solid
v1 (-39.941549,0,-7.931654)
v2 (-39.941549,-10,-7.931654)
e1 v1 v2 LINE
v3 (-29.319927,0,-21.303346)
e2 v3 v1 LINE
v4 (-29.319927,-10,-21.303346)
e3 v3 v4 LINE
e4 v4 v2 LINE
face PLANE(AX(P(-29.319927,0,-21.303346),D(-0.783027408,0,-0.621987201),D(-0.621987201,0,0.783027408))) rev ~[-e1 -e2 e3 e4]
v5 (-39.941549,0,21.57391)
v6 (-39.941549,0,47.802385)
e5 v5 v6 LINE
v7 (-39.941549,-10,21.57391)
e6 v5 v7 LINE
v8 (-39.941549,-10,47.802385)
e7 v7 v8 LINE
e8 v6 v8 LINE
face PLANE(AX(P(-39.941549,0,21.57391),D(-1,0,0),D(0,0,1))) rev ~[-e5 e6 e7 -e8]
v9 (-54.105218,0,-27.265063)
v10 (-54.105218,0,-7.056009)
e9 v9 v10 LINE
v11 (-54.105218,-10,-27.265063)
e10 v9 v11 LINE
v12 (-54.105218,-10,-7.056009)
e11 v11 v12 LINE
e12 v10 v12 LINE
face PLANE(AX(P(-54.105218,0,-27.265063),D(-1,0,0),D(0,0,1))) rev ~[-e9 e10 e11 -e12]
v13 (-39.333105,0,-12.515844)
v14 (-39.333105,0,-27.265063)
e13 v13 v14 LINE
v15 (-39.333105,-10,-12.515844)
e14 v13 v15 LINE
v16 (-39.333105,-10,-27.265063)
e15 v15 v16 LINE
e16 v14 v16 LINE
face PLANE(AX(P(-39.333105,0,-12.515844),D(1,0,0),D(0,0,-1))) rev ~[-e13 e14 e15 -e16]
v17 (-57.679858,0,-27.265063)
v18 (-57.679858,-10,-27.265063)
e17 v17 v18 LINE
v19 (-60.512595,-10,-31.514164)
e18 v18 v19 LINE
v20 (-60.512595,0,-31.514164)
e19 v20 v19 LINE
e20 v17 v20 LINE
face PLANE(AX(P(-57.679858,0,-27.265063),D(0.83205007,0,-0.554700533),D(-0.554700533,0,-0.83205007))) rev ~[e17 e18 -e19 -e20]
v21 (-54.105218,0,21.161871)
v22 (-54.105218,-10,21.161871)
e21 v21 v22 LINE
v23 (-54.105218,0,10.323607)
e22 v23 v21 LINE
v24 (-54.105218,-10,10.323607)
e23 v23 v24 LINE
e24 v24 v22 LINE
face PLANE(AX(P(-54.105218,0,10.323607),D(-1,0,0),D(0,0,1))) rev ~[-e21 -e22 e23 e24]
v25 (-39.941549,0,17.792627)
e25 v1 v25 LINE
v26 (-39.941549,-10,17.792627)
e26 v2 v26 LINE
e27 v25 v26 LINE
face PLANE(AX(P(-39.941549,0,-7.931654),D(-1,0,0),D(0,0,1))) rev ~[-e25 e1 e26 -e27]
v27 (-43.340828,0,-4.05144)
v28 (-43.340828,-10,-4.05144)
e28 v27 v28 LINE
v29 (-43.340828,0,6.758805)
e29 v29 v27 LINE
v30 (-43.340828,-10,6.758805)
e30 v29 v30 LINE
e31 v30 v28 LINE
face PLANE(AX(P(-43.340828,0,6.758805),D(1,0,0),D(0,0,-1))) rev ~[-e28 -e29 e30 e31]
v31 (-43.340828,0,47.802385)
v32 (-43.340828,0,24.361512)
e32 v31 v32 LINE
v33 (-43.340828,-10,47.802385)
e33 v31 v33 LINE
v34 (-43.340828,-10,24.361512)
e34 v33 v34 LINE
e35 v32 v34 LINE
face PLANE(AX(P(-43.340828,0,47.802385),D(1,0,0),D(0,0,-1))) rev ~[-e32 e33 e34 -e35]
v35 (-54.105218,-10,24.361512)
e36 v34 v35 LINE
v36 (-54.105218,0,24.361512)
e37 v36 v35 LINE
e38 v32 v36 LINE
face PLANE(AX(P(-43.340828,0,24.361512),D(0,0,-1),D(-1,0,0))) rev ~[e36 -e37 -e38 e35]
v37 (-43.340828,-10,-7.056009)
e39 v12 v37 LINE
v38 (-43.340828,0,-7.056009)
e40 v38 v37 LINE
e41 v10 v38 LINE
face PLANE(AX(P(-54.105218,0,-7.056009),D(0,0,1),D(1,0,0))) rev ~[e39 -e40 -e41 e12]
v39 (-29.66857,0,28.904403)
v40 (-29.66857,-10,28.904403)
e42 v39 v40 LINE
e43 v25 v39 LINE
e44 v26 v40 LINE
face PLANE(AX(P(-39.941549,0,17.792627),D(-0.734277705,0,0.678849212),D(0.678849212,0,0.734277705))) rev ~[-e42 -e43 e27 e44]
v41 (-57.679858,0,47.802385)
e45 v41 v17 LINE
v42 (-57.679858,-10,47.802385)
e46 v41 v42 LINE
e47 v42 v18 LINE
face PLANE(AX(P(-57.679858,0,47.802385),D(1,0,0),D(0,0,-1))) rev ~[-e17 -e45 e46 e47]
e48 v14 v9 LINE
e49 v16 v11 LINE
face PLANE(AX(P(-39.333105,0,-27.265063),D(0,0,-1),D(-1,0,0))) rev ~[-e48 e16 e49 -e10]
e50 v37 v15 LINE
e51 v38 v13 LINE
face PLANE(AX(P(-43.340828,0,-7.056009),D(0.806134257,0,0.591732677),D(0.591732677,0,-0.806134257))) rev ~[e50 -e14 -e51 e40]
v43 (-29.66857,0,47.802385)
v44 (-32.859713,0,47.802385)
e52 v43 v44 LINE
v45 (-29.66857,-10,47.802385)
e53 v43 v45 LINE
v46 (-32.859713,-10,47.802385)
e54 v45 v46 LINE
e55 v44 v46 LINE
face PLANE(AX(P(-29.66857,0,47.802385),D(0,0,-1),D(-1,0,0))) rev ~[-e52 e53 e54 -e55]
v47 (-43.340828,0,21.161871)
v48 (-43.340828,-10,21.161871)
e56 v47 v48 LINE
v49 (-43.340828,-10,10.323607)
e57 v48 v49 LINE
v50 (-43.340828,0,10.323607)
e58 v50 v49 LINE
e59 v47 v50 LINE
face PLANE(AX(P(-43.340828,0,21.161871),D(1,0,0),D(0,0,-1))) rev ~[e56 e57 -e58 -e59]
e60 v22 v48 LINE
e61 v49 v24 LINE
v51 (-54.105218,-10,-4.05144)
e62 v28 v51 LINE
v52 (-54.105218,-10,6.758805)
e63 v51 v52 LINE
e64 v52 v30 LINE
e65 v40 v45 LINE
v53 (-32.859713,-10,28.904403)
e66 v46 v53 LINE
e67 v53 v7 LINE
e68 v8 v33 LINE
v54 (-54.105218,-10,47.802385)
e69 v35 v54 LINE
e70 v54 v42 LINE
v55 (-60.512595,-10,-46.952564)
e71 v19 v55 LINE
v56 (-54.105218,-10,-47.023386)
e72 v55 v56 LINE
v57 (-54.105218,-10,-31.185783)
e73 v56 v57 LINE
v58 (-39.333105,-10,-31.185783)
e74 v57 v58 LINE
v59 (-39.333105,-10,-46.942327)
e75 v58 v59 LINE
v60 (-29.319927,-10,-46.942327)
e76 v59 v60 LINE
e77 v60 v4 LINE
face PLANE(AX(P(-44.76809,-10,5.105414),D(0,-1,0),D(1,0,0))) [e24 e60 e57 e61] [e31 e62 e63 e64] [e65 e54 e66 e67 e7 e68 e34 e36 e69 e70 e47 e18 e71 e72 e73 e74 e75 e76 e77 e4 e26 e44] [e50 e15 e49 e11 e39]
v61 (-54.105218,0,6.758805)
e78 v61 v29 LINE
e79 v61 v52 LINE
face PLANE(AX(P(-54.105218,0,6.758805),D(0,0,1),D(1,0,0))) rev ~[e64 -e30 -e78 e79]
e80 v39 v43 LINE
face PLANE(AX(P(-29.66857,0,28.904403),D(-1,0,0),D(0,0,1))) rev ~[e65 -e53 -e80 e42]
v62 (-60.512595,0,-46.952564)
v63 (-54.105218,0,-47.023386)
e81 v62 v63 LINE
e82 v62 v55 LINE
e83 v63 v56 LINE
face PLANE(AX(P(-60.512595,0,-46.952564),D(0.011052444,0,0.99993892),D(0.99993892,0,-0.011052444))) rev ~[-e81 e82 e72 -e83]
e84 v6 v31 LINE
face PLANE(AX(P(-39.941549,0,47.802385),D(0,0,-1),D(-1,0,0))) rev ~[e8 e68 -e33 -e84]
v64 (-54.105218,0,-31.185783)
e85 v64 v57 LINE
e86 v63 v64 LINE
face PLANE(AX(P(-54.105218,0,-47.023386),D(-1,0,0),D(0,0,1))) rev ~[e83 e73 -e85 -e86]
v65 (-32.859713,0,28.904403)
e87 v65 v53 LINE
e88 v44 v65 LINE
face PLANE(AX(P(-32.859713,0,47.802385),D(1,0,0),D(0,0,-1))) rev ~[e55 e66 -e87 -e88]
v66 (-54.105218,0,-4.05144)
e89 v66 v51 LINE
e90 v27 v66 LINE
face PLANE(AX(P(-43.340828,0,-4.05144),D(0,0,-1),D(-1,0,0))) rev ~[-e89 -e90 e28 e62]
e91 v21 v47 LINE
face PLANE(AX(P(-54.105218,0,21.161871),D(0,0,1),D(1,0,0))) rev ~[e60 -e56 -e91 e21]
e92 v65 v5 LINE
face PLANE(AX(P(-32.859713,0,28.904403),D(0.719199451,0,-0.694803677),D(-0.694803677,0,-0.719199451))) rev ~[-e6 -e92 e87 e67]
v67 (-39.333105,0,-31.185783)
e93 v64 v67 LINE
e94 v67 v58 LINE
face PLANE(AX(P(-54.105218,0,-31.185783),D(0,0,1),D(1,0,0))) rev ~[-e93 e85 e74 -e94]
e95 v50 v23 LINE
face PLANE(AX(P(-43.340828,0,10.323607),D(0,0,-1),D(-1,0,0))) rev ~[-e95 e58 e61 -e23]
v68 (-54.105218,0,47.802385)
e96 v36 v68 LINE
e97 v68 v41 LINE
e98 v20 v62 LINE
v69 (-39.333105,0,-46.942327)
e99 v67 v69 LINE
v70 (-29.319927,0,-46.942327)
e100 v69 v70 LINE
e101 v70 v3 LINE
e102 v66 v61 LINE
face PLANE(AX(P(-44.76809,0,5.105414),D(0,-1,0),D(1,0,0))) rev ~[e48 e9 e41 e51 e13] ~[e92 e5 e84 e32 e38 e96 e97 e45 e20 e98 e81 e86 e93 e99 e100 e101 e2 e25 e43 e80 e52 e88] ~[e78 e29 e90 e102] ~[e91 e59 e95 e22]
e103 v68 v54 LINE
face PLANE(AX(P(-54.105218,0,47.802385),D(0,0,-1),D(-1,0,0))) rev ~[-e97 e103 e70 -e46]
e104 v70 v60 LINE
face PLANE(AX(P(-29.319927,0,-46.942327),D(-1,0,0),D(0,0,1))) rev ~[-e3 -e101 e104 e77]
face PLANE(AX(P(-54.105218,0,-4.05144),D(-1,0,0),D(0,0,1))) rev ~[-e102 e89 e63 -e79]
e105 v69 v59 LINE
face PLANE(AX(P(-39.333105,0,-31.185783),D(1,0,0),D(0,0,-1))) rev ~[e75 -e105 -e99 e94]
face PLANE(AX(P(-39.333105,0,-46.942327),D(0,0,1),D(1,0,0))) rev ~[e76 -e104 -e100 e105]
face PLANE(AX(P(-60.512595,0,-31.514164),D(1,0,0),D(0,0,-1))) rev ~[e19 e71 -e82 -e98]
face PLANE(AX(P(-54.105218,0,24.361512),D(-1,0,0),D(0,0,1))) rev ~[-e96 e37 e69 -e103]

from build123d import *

# Parameters (mm, degrees)
F1_DEPTH = 10


# Not quite as in the source:
# - a feature of the source that left no trace in its solid (it failed there, or was rolled back) is left out


with BuildPart() as f1:
    # F0 (on Front) → F1 (new body)
    with BuildSketch(Plane.XZ):
        Polygon((-54.1052184999, 47.8023849428), (-57.6798580587, 47.8023849428), (-57.6798580587, -27.2650625557), (-60.5125948787, -31.5141640604), (-60.5125948787, -46.9525642693), (-54.1052184999, -47.0233857632), (-54.1052184999, -31.1857834458), (-39.3331050873, -31.1857834458), (-39.3331050873, -46.9423271716), (-29.3199270964, -46.9423271716), (-29.3199270964, -21.3033463806), (-39.9415493011, -7.9316543415), (-39.9415493011, 17.7926272154), (-29.6685695648, 28.9044026285), (-29.6685695648, 47.8023849428), (-32.8597128391, 47.8023849428), (-32.8597128391, 28.9044026285), (-39.9415493011, 21.5739104897), (-39.9415493011, 47.8023849428), (-43.3408282697, 47.8023849428), (-43.3408282697, 24.3615116924), (-54.1052184999, 24.3615116924), align=None)
        Polygon((-54.1052184999, -7.0560085587), (-43.3408282697, -7.0560085587), (-39.3331050873, -12.5158438459), (-39.3331050873, -27.2650625557), (-54.1052184999, -27.2650625557), align=None, mode=Mode.SUBTRACT)
        Polygon((-43.3408282697, 6.7588053644), (-43.3408282697, -1.2844107114), (-43.3408282697, -4.0514403954), (-54.1052184999, -4.0514403954), (-54.1052184999, 6.7588053644), align=None, mode=Mode.SUBTRACT)
        Polygon((-43.3408282697, 21.1618710309), (-43.3408282697, 11.6142081097), (-43.3408282697, 10.3236073628), (-54.1052184999, 10.3236073628), (-54.1052184999, 21.1618710309), align=None, mode=Mode.SUBTRACT)
    extrude(amount=F1_DEPTH)


solid = f1.part
